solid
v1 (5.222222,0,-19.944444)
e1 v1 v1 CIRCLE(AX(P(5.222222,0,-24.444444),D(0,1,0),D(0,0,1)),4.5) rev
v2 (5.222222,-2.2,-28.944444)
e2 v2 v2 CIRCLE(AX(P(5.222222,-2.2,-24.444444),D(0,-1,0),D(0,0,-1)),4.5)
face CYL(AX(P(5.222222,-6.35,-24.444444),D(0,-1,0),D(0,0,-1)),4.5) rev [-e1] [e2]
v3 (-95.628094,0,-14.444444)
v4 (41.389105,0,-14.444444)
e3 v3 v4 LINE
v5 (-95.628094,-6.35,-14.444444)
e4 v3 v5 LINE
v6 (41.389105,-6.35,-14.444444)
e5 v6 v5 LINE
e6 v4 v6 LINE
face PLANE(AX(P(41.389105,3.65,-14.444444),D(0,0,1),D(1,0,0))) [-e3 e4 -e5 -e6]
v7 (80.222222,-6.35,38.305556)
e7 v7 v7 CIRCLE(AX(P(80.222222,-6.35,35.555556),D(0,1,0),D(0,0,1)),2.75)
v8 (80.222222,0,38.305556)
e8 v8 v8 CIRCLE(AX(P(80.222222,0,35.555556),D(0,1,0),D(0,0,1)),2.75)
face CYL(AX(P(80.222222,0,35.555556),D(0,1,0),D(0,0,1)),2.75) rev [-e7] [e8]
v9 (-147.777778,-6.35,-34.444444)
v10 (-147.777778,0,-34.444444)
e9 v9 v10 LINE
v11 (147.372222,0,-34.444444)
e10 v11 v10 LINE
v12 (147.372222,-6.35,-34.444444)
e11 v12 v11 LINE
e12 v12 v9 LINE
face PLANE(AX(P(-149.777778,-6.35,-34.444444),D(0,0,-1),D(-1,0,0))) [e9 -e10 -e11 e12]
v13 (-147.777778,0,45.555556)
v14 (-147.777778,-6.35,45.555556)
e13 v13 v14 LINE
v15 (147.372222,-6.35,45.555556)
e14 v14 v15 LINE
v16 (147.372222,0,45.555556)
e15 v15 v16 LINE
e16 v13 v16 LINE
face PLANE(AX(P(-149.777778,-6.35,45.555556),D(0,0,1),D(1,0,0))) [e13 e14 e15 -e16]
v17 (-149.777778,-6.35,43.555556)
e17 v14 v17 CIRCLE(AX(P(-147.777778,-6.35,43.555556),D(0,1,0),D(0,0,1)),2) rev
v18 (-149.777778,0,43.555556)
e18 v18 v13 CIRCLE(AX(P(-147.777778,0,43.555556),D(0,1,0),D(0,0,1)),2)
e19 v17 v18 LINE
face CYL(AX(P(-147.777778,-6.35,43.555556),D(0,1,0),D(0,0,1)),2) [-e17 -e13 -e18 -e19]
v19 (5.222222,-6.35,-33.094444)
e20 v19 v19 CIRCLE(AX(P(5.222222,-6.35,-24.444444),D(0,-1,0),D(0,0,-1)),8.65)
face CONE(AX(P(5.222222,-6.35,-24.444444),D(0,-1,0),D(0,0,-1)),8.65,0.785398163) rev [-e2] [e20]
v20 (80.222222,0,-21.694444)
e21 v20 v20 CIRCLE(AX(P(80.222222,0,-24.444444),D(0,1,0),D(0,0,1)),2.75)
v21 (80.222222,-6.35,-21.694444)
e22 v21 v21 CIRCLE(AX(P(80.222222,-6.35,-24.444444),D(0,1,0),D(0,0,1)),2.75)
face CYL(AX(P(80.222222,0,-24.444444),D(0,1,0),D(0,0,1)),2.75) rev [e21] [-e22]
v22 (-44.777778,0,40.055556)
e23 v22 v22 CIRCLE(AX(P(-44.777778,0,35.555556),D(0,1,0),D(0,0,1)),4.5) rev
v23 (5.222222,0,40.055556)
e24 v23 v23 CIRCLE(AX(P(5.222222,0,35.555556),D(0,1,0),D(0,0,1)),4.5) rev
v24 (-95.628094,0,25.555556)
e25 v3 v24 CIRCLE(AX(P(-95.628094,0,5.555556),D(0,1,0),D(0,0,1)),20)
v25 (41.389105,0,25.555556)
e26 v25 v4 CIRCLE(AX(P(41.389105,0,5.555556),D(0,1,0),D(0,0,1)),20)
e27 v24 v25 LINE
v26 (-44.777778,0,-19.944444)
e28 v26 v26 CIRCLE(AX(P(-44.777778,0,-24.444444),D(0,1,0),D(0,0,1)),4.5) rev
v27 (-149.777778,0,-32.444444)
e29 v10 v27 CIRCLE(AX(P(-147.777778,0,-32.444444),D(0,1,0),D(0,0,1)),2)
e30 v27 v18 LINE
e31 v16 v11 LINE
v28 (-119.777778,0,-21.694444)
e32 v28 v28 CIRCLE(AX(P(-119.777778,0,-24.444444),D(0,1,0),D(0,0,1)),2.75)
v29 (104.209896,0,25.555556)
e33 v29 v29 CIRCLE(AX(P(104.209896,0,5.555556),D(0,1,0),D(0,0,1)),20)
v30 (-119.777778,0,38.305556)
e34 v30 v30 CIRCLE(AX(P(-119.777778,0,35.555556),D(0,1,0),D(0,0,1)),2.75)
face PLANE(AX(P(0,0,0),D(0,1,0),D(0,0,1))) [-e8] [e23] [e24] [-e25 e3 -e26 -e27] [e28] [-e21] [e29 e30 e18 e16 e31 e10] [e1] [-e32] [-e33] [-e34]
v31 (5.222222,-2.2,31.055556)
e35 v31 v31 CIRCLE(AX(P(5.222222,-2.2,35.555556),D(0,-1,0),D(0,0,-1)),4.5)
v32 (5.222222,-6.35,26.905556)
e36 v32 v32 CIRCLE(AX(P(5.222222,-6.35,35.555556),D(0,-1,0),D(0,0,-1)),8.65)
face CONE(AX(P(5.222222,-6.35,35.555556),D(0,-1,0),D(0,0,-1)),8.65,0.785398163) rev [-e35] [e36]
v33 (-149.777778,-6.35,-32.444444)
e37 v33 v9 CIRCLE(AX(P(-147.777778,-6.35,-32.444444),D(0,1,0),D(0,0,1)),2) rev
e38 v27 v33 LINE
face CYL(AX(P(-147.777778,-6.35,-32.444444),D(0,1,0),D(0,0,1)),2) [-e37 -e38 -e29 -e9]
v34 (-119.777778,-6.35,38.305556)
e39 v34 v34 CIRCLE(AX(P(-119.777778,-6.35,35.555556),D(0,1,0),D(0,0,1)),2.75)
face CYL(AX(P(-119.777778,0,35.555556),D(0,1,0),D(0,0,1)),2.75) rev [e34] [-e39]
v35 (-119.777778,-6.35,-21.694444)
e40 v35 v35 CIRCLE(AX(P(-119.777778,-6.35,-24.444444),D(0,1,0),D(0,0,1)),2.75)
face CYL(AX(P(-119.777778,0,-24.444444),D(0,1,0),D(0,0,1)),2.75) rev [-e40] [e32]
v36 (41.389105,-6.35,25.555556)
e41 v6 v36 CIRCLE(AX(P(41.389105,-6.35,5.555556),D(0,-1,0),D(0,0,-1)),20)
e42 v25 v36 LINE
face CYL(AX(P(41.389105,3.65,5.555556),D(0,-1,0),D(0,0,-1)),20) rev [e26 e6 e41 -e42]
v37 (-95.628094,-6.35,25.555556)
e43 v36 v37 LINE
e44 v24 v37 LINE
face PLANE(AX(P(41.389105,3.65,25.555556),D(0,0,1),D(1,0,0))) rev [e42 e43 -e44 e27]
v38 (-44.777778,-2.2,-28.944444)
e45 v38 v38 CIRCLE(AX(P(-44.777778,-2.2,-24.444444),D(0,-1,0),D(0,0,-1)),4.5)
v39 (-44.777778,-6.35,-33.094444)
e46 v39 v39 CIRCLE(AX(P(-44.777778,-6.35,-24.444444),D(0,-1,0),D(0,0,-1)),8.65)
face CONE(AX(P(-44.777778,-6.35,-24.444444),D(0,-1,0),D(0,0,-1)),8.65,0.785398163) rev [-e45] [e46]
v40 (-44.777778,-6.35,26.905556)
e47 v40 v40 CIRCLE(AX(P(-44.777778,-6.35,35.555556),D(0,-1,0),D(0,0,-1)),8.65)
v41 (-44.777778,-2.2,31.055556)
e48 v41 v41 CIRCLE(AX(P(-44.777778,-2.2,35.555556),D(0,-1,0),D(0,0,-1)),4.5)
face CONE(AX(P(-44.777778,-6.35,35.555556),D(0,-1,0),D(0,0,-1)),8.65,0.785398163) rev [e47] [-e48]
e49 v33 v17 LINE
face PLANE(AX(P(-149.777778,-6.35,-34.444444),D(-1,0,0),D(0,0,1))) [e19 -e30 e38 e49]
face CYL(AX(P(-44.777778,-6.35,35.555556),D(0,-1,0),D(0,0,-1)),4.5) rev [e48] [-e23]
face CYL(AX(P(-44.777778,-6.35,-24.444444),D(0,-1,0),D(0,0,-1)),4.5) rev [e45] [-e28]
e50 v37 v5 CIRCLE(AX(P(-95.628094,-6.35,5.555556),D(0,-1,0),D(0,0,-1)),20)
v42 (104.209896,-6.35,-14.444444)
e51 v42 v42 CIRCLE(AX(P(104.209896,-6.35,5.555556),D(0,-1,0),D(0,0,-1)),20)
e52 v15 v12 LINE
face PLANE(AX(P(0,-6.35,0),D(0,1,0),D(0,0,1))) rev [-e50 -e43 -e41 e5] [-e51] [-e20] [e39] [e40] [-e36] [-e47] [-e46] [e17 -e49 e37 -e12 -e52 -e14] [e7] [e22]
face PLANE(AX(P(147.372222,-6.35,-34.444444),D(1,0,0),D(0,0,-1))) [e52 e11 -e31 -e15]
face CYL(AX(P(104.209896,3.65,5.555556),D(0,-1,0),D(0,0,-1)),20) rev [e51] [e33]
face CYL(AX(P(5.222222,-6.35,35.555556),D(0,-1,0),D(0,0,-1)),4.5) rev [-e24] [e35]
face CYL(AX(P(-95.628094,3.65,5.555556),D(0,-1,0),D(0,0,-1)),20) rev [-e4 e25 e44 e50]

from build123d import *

# Parameters (mm, degrees)
CROQUIS1_W                                      = 297.15
CROQUIS1_H                                      = 80
BRIDA_BASE1_DEPTH                               = 6.35
REDONDEO1_R                                     = 2
TALADRO_DE_MARGEN_PARA_M51_D                    = 5.5
CROQUIS9_R                                      = 20
CORTAR_EXTRUIR1_DEPTH                           = 10
CSK_FOR_M8_OVAL_HEAD_MACHINE_SCREW1_D           = 9
CSK_FOR_M8_OVAL_HEAD_MACHINE_SCREW1_CSINK_D     = 17.3
CSK_FOR_M8_OVAL_HEAD_MACHINE_SCREW1_CSINK_ANGLE = 90


# Sheet-metal steps are written as plain solids
with BuildPart() as part:
    # Croquis1 → Brida base1 (new body)
    with BuildSketch(Plane(origin=(0, 0, 0), x_dir=(1, 0, 0), z_dir=(0, 1, 0))):
        with Locations((-1.202777778, -5.555555556)):
            Rectangle(CROQUIS1_W, CROQUIS1_H)
    extrude(amount=-BRIDA_BASE1_DEPTH)

    # Redondeo1
    redondeo1_edges = [part.edges().sort_by_distance(p)[0] for p in [
        (-149.777777778, -3.175, -34.444444444),
        (-149.777777778, -3.175, 45.555555556),
    ]]
    fillet(redondeo1_edges, radius=REDONDEO1_R)

    # Taladro de margen para M51 (through all)
    with Locations(Plane(origin=(0, 0, 0), x_dir=(1, 0, 0), z_dir=(0, 1, 0))):
        with Locations((-119.777777778, 24.444444444), (-119.777777778, -35.555555556), (80.222222222, -35.555555556), (80.222222222, 24.444444444)):
            Hole(TALADRO_DE_MARGEN_PARA_M51_D / 2)

    # Croquis9 → Cortar-Extruir1 (cut)
    with BuildSketch(Plane(origin=(0, -6.35, 0), x_dir=(-1, 0, 0), z_dir=(0, -1, 0))):
        with Locations(Location((-104.209895864, -5.555555556, 0), (0, 0, 90))):
            Circle(CROQUIS9_R)
        with BuildLine():
            Line((-41.389105309, 14.444444444), (95.628093505, 14.444444444))
            ThreePointArc((95.628093505, 14.444444444), (115.628093505, -5.555555556), (95.628093505, -25.555555556))
            Line((95.628093505, -25.555555556), (-41.389105309, -25.555555556))
            ThreePointArc((-41.389105309, -25.555555556), (-61.389105309, -5.555555556), (-41.389105309, 14.444444444))
        make_face()
    extrude(amount=-CORTAR_EXTRUIR1_DEPTH, mode=Mode.SUBTRACT)

    # CSK for M8 Oval Head Machine Screw1 (through all)
    with Locations(Plane(origin=(-44.777777778, -6.35, -24.444444444), x_dir=(0, 0, -1), z_dir=(0, -1, 0))):
        with Locations((0, 0), (0, 50), (-60, 50), (-60, 0)):
            CounterSinkHole(CSK_FOR_M8_OVAL_HEAD_MACHINE_SCREW1_D / 2, CSK_FOR_M8_OVAL_HEAD_MACHINE_SCREW1_CSINK_D / 2, counter_sink_angle=CSK_FOR_M8_OVAL_HEAD_MACHINE_SCREW1_CSINK_ANGLE)


solid = part.part
